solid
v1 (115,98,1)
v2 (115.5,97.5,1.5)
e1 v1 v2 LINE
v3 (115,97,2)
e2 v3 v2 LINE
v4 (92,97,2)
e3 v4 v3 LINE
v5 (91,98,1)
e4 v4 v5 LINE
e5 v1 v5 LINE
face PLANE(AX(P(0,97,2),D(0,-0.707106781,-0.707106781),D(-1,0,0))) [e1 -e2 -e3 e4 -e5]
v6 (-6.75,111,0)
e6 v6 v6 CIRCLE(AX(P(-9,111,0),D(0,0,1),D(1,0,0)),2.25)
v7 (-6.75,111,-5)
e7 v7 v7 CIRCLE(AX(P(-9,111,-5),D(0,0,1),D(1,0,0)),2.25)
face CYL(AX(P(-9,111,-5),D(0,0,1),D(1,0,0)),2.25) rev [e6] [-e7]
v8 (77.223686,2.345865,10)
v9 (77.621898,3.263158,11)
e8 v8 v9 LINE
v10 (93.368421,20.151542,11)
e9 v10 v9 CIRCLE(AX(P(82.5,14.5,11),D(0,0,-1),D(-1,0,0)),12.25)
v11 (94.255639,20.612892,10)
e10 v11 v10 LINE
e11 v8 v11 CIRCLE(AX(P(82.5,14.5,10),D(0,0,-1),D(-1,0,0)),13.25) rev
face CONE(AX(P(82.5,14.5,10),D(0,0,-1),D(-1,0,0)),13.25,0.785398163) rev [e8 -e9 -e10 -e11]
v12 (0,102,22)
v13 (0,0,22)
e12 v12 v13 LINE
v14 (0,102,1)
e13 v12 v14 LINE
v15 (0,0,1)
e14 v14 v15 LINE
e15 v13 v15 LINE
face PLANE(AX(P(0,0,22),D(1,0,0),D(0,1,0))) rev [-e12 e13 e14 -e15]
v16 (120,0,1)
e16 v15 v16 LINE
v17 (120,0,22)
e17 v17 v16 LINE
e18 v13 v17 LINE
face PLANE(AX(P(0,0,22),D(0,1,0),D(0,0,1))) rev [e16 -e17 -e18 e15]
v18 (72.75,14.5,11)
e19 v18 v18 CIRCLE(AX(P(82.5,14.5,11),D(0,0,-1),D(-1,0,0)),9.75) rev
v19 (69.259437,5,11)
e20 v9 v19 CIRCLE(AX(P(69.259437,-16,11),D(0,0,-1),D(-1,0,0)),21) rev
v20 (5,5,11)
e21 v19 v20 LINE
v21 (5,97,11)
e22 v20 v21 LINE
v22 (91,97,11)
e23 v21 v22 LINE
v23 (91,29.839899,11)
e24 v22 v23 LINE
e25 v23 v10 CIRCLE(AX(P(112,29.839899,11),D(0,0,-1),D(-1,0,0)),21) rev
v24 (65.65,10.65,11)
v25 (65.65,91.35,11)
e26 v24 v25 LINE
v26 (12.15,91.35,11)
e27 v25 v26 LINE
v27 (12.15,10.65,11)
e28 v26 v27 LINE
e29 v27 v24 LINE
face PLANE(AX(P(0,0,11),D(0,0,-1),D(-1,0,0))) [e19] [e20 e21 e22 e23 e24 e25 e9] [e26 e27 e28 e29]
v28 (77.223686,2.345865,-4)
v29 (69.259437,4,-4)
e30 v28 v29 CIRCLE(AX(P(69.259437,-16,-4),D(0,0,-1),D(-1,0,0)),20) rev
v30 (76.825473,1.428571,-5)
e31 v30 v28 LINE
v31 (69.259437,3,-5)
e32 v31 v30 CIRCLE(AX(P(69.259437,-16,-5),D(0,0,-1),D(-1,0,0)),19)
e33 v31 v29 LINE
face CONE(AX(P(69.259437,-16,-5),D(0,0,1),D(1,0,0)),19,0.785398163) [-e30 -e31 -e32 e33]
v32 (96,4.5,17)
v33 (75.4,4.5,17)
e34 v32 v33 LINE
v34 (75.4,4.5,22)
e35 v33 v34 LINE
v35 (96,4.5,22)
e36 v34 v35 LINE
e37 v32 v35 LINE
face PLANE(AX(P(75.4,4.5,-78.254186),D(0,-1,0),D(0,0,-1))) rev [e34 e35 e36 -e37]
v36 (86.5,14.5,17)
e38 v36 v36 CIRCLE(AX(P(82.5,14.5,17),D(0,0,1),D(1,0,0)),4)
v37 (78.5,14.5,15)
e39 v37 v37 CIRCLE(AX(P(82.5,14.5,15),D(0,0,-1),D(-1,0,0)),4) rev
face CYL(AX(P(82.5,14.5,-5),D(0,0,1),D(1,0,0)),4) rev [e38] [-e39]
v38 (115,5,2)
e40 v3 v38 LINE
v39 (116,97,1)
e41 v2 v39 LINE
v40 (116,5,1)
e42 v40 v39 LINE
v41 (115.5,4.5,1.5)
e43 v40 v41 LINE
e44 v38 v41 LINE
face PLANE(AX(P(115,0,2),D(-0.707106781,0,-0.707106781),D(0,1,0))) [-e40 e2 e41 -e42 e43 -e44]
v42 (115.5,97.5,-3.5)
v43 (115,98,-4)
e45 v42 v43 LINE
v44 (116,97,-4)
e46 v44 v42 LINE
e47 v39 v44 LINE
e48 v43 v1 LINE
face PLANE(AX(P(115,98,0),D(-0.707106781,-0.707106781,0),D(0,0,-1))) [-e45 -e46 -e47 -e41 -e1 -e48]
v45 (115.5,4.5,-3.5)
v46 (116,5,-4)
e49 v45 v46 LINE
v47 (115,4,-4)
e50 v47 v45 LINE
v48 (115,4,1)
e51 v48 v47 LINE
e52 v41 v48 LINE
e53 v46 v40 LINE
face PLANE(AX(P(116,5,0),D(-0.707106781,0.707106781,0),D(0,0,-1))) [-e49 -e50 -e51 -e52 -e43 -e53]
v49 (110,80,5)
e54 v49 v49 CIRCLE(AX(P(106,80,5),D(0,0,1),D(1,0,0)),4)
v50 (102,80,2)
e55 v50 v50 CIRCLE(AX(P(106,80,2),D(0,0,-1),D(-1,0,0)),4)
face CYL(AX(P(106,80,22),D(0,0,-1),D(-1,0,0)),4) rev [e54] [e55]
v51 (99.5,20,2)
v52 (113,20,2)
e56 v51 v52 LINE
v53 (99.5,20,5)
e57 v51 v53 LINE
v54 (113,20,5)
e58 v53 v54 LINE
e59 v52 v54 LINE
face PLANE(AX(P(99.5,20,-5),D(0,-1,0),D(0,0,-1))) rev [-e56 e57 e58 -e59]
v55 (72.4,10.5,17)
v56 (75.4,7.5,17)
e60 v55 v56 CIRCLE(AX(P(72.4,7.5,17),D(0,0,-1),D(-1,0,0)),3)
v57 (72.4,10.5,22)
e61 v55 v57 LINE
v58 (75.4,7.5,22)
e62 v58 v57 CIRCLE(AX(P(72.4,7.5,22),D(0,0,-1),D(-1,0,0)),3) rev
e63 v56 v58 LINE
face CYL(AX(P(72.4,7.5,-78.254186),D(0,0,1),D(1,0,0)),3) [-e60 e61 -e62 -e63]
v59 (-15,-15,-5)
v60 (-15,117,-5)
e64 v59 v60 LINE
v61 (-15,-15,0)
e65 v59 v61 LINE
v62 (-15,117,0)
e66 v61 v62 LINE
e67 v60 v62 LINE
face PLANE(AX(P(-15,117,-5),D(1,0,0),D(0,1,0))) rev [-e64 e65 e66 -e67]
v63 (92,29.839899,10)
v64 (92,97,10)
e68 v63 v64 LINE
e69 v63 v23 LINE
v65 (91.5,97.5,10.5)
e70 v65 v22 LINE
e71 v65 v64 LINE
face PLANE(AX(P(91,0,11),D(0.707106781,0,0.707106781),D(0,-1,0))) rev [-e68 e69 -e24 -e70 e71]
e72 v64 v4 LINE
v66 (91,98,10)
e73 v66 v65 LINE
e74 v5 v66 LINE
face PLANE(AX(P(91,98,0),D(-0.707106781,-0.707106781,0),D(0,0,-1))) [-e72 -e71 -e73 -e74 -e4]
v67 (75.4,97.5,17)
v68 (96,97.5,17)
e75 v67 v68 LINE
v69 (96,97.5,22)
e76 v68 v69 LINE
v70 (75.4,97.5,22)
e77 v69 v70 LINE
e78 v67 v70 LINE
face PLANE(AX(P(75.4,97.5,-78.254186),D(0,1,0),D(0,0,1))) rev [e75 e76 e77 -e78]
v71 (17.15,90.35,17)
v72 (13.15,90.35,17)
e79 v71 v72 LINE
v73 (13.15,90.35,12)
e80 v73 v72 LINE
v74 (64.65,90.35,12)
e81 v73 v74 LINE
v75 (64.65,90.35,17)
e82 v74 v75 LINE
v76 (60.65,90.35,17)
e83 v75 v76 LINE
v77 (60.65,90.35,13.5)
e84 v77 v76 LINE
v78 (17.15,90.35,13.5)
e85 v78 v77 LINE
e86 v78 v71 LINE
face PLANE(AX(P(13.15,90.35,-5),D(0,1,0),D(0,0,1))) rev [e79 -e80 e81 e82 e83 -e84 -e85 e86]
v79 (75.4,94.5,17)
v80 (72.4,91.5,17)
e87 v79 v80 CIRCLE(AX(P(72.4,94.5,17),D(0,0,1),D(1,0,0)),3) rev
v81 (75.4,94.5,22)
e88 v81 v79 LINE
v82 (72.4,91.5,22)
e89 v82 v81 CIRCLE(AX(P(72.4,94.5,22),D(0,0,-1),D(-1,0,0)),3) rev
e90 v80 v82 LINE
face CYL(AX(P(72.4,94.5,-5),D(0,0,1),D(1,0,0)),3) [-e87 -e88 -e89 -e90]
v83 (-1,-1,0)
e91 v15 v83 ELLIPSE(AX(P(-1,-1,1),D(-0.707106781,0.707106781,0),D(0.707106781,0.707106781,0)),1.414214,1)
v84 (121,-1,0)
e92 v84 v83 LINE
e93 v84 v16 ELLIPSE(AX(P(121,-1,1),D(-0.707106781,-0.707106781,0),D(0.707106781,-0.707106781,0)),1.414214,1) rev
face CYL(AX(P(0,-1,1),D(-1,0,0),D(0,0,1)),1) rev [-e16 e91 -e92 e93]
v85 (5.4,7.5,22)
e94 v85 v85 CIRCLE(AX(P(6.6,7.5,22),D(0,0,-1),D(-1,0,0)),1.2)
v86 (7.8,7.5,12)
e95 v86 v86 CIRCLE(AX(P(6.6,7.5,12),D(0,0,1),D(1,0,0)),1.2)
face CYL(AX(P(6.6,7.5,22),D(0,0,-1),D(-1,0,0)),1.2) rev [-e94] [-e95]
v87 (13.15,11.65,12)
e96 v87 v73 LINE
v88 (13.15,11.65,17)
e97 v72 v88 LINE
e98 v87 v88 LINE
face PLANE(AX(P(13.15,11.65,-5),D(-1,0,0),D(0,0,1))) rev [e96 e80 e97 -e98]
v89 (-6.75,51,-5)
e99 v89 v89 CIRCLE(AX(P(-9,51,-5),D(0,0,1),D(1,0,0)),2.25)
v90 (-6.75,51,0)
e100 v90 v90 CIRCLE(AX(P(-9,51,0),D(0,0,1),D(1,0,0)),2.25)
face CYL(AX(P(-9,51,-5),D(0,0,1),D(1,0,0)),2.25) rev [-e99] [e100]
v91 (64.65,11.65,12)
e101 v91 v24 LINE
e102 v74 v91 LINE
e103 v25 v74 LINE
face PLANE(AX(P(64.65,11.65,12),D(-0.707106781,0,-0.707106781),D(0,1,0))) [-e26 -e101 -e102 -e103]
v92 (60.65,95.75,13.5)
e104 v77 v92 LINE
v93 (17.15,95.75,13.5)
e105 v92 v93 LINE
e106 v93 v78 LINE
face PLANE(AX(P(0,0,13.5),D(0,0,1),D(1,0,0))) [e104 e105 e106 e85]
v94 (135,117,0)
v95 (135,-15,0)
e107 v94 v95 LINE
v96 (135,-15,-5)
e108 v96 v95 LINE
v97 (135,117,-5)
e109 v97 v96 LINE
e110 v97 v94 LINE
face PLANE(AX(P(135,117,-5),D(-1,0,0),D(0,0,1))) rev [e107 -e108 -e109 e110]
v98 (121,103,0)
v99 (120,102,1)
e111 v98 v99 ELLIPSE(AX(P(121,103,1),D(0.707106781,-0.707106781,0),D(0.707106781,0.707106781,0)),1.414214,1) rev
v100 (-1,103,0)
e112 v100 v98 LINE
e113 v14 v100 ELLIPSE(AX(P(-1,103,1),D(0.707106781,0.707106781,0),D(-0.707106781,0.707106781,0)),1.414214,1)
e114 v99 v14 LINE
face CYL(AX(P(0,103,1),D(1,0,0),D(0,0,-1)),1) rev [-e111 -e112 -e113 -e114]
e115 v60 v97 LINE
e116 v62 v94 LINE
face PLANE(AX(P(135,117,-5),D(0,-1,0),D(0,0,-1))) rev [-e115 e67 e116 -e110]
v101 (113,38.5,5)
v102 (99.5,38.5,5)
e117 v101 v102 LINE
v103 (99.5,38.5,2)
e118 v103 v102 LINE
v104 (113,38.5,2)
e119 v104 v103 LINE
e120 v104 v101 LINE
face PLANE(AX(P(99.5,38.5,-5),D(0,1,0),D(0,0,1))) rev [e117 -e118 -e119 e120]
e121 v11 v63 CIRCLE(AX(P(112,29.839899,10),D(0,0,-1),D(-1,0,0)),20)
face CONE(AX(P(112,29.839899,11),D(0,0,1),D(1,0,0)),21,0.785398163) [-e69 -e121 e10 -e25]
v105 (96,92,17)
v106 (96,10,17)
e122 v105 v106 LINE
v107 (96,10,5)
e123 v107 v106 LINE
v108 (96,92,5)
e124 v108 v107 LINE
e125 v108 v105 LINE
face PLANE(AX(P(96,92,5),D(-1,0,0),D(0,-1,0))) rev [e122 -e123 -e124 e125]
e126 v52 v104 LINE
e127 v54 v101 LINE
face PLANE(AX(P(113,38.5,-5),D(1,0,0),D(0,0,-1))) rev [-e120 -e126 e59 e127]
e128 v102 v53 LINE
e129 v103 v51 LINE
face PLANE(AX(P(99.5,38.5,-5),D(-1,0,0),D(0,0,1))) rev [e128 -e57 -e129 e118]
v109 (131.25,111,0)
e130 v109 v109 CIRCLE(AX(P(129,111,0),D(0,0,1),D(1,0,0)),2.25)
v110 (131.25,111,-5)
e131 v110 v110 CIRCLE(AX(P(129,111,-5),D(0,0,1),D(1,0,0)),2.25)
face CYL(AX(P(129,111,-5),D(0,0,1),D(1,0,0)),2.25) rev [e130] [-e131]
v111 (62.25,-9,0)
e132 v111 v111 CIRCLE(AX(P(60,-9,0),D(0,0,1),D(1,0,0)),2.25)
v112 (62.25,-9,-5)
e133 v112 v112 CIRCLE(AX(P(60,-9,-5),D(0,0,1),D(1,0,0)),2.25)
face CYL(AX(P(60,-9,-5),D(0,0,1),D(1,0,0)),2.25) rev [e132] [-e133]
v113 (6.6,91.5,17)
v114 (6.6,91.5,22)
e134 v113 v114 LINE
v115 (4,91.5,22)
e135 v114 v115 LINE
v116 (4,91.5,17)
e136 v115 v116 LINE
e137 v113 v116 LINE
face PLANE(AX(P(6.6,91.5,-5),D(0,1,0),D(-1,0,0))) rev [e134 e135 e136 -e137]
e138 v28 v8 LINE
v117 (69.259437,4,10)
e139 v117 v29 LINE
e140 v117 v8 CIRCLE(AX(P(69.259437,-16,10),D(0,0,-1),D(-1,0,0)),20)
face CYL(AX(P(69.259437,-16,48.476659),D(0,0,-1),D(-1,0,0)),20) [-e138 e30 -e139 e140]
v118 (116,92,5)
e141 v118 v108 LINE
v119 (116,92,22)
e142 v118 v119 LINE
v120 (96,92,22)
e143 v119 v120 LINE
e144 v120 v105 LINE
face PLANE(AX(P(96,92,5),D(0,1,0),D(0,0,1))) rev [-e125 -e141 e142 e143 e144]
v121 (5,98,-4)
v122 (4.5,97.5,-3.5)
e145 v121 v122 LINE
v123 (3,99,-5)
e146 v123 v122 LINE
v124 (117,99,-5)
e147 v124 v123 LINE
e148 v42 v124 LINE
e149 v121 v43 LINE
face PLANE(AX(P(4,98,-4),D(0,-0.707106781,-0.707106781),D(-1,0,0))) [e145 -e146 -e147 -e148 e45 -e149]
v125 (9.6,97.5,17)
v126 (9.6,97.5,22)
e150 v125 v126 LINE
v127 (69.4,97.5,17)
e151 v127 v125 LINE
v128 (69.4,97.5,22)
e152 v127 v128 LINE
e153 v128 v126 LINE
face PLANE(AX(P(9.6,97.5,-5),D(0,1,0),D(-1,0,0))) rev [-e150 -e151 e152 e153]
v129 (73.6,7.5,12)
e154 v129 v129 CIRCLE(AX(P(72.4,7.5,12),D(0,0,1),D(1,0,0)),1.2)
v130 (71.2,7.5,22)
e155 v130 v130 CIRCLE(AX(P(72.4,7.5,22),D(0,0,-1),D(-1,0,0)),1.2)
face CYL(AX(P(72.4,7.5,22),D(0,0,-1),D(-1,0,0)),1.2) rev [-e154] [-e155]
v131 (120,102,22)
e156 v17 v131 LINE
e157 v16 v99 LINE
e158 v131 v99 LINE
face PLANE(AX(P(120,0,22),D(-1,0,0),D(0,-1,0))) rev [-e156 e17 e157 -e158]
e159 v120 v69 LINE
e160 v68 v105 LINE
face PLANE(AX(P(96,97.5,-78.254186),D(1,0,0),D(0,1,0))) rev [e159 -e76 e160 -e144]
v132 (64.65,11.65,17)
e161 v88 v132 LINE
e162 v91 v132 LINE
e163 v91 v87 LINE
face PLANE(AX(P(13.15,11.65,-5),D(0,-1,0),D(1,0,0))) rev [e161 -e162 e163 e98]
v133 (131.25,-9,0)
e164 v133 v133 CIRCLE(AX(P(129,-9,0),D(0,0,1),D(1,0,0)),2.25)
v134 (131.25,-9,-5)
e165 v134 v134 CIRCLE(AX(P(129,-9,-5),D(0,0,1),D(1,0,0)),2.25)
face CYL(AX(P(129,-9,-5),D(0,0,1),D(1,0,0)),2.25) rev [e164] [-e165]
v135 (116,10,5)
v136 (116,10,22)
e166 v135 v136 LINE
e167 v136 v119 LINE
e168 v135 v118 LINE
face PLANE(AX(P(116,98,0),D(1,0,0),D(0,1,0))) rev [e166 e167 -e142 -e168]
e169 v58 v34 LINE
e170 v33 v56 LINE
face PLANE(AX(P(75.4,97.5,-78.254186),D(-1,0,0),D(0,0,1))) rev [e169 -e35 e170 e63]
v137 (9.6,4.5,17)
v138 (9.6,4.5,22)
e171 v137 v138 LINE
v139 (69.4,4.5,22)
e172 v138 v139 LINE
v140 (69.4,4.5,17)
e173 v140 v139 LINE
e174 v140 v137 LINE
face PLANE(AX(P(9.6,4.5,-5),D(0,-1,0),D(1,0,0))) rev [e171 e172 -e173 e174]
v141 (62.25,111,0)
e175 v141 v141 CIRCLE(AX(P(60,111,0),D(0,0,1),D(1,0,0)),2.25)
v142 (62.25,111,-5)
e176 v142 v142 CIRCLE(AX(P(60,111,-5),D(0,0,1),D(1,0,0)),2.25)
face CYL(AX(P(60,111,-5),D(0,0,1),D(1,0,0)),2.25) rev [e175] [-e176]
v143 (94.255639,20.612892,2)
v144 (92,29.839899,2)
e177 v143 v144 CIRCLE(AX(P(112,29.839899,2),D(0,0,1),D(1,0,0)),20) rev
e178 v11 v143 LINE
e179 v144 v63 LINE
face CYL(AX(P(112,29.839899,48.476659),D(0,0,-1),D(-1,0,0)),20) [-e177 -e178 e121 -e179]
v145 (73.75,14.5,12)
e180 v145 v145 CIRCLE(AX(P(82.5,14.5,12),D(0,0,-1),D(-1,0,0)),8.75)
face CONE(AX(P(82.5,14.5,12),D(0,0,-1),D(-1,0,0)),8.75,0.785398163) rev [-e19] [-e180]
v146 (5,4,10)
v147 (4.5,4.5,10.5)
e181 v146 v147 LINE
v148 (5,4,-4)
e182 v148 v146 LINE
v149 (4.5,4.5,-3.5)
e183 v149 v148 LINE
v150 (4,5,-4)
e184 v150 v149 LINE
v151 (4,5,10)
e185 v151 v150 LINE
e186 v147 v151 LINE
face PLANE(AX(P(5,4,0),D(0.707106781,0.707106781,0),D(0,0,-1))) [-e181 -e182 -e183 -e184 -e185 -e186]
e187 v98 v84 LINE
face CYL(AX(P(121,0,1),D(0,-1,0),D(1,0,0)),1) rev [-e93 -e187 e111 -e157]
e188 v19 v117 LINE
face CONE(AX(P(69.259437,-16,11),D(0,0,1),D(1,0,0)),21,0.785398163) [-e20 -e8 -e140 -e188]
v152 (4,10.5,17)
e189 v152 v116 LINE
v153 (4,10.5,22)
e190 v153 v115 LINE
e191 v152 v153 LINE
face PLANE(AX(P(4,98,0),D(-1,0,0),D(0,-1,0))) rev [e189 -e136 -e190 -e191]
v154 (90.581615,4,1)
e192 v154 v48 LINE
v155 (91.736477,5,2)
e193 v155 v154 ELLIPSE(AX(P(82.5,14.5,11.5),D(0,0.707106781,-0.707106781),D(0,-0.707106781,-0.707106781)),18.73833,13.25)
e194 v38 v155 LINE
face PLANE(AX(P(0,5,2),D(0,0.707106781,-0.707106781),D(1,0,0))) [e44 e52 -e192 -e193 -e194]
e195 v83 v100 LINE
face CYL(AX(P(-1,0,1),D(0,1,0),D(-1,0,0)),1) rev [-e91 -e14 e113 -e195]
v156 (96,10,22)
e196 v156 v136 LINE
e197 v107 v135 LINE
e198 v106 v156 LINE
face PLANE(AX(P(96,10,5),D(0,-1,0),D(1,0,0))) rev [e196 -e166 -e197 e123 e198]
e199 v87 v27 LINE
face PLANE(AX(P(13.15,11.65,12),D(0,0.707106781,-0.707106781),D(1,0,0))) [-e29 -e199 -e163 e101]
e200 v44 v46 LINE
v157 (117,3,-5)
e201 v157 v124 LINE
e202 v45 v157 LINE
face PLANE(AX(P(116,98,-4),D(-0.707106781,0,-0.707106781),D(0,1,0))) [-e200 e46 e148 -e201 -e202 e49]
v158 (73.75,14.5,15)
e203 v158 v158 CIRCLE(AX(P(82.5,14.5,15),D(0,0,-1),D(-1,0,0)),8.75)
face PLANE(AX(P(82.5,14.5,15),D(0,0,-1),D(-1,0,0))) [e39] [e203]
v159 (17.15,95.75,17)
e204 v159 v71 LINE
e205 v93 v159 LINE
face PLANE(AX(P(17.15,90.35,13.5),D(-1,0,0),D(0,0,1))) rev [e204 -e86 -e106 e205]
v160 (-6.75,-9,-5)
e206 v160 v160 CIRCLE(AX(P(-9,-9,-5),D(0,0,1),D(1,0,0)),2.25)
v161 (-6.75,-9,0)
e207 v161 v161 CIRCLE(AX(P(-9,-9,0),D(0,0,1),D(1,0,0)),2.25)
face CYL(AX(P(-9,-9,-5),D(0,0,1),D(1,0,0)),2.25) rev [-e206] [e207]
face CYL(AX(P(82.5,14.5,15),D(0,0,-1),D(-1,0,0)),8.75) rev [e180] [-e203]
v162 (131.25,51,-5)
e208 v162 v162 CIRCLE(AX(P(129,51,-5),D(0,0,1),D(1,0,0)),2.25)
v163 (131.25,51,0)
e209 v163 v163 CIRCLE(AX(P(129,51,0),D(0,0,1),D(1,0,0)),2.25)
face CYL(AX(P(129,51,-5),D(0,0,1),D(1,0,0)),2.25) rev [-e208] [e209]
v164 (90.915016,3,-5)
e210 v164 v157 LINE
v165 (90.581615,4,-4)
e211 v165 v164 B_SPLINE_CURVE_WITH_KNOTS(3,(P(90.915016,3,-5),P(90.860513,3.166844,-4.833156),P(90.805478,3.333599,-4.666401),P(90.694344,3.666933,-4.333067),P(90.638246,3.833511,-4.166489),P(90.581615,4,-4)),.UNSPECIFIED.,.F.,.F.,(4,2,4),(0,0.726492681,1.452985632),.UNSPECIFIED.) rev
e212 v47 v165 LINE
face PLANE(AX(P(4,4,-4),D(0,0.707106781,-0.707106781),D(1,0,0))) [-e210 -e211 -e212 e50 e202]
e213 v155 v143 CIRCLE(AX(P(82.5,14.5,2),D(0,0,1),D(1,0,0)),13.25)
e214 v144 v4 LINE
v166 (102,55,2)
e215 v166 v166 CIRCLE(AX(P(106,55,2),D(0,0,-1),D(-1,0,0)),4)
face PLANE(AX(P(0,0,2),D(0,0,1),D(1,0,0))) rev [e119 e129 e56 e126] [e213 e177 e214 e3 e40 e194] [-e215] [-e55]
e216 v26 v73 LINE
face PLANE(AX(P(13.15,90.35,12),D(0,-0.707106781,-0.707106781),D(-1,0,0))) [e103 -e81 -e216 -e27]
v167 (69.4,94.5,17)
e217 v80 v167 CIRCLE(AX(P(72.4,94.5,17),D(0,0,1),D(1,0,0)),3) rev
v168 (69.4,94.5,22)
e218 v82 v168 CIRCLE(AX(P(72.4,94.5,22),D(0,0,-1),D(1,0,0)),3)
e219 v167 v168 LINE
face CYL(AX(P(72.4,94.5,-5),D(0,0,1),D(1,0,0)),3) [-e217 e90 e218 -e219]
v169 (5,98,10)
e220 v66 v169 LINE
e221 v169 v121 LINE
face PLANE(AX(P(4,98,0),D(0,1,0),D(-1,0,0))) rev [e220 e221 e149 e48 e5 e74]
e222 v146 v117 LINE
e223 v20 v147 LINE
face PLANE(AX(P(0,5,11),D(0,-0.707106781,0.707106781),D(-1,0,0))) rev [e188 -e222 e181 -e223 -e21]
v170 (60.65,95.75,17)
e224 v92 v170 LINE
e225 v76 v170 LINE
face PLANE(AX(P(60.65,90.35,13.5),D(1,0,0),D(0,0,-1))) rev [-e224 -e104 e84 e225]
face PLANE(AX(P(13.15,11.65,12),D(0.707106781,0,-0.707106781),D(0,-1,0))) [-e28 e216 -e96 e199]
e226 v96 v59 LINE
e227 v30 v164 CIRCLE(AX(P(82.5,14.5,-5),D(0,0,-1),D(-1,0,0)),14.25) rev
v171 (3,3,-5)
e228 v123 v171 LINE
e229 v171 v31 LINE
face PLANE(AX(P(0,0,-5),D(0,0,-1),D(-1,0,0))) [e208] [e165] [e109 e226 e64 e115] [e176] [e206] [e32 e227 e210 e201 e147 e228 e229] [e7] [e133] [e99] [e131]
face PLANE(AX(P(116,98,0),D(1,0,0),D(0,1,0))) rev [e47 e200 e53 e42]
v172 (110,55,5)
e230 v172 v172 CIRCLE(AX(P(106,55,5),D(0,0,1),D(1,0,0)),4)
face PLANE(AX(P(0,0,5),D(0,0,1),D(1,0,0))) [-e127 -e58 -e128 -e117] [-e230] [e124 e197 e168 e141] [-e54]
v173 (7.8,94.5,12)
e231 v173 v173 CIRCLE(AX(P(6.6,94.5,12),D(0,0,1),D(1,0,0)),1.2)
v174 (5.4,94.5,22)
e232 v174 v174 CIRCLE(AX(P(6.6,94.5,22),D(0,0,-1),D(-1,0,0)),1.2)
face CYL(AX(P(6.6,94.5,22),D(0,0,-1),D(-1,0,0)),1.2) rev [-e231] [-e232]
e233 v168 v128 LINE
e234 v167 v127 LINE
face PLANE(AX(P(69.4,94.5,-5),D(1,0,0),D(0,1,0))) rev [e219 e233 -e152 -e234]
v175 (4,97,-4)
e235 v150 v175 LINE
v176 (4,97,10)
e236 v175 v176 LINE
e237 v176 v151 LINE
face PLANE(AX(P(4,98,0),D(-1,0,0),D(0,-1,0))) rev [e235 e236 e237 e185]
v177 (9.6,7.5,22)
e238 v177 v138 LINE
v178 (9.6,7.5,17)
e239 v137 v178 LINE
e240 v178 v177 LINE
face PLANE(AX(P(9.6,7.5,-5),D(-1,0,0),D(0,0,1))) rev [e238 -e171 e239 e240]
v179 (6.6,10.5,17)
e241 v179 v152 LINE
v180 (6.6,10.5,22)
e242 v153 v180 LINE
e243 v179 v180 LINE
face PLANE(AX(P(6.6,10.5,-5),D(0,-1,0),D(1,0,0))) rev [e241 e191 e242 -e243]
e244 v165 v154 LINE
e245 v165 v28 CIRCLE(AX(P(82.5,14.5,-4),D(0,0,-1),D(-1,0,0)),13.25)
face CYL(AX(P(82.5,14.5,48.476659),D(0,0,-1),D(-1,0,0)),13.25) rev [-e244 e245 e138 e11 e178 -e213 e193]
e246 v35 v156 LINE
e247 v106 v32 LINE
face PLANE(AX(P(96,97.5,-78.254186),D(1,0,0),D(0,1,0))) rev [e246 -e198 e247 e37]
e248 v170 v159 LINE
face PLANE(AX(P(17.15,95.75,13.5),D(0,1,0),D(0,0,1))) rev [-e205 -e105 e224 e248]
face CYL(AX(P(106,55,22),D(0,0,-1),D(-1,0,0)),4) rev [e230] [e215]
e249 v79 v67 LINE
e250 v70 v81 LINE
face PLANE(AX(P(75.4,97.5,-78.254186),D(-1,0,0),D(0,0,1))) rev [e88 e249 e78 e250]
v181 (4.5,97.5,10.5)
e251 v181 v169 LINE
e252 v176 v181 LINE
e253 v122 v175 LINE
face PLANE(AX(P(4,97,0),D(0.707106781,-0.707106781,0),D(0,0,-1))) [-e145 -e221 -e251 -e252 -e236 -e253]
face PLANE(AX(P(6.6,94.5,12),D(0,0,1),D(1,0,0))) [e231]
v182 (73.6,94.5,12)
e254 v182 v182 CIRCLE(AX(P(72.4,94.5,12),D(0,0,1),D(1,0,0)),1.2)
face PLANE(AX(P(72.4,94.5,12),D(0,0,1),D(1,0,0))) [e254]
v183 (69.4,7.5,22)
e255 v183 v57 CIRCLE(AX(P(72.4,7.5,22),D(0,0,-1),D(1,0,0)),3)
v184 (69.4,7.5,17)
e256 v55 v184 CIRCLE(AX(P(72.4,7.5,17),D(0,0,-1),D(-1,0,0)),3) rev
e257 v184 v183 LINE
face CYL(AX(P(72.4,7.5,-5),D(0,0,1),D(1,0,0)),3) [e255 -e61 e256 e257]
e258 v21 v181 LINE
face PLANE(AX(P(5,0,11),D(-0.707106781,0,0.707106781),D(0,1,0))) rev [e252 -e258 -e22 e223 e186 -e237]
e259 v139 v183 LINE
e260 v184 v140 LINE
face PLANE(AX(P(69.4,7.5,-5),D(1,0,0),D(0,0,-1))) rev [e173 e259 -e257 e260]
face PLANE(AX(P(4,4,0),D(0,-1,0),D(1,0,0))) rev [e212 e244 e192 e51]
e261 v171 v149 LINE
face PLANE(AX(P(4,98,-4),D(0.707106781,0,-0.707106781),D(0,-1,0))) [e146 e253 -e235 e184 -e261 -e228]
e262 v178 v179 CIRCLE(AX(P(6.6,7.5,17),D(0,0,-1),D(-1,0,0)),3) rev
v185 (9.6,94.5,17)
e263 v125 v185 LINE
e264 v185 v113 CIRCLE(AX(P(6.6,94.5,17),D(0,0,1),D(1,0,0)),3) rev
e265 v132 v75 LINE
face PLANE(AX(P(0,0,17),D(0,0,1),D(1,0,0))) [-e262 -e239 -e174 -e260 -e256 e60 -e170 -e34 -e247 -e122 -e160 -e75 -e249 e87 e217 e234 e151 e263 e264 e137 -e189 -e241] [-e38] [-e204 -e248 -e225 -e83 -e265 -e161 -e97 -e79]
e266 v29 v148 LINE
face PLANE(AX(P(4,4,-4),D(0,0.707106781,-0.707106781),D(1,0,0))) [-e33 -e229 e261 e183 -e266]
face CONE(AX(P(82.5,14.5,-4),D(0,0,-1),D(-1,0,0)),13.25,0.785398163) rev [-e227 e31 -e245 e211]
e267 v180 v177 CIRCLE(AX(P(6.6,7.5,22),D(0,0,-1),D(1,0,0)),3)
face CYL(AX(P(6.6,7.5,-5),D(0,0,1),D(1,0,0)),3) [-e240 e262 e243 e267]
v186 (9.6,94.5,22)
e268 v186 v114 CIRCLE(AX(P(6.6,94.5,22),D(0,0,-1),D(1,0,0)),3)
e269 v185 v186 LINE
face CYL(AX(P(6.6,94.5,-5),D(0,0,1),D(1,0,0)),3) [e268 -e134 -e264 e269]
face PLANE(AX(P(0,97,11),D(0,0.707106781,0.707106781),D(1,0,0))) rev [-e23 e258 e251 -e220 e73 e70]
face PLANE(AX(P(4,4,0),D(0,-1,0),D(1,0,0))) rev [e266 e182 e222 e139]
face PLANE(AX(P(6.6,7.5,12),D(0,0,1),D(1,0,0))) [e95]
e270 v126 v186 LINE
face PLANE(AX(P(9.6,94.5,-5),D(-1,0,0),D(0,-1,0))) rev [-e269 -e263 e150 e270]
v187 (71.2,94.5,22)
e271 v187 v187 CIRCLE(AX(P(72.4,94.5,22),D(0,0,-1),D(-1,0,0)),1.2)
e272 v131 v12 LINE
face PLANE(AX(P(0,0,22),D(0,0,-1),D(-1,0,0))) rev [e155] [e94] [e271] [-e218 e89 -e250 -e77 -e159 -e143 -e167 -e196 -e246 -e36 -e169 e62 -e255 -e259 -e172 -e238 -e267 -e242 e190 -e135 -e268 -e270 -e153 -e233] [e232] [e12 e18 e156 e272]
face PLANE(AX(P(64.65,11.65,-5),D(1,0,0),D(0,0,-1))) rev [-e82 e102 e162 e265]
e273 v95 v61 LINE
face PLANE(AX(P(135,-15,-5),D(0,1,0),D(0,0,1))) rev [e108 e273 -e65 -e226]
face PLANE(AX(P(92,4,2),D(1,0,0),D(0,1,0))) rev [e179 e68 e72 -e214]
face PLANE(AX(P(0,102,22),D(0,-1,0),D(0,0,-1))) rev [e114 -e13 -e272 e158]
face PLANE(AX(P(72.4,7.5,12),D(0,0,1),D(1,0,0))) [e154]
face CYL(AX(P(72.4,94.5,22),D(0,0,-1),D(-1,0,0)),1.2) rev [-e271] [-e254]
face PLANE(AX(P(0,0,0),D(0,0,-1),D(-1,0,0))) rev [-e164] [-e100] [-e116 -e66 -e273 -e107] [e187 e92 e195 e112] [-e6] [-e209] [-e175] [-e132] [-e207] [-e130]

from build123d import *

# Parameters (mm, degrees)
SKETCH_1_W          = 120
SKETCH_1_H          = 102
EXTRUDE_1_DEPTH     = 22
SKETCH_2_W          = 112
SKETCH_2_H          = 94
CUT_EXTRUDE_1_DEPTH = 160.022011055
SKETCH_3_W          = 150
SKETCH_3_H          = 132
SKETCH_3_W_2        = 112
SKETCH_3_H_2        = 94
EXTRUDE_2_DEPTH     = 5
SKETCH_4_W          = 112
SKETCH_4_H          = 15
EXTRUDE_3_DEPTH     = 5
SKETCH_6_R          = 1.2
CUT_EXTRUDE_2_DEPTH = 180.994444359
FILLET_1_R          = 1
SKETCH_7_R          = 2.25
CUT_EXTRUDE_3_DEPTH = 180.994444359
SKETCH_8_W          = 24
SKETCH_8_H          = 94
EXTRUDE_4_DEPTH     = 15
SKETCH_9_W          = 20
SKETCH_9_H          = 82
CUT_EXTRUDE_4_DEPTH = 17
SKETCH_10_R         = 4
CUT_EXTRUDE_5_DEPTH = 180.760952378
SKETCH_11_W         = 13.5
SKETCH_11_H         = 18.5
CUT_EXTRUDE_6_DEPTH = 180.451943428
CUT_EXTRUDE1_DEPTH  = 181.673739099
SKETCH2_W           = 20.6
SKETCH2_H           = 93
CUT_EXTRUDE2_DEPTH  = 5
FILLET1_R           = 3
SKETCH3_W           = 27
SKETCH3_H           = 81
BOSS_EXTRUDE1_DEPTH = 0.4
SKETCH4_W           = 88
SKETCH4_H           = 94
BOSS_EXTRUDE2_DEPTH = 6
SKETCH6_W           = 51.5
SKETCH6_H           = 78.7
CUT_EXTRUDE3_DEPTH  = 180.994444359
SKETCH7_W           = 43.5
SKETCH7_H           = 5.4
CUT_EXTRUDE4_DEPTH  = 3.5
SKETCH8_R           = 4
CUT_EXTRUDE5_DEPTH  = 180.994444359
SKETCH9_R           = 8.75
CUT_EXTRUDE6_DEPTH  = 4
CUT_EXTRUDE8_START  = -5
SKETCH11_R          = 1.2
CUT_EXTRUDE8_DEPTH  = 5
SKETCH13_R          = 13.25
CUT_EXTRUDE9_DEPTH  = 16
BOSS_EXTRUDE3_DEPTH = 9
FILLET2_R           = 20
CHAMFER1_SIZE       = 1
CHAMFER2_SIZE       = 1
CHAMFER4_SIZE       = 1


# Some blends are built 0.0001 mm under size
with BuildPart() as part:
    # Эскиз1 → Бобышка-Вытянуть1 (new body)
    with BuildSketch(Plane.XY):
        with Locations((60, 51)):
            Rectangle(SKETCH_1_W, SKETCH_1_H)
    extrude(amount=EXTRUDE_1_DEPTH)

    # Эскиз2 → Вырез-Вытянуть1 (cut, through all)
    with BuildSketch(Plane.XY.offset(22)):
        with Locations((60, 51)):
            Rectangle(SKETCH_2_W, SKETCH_2_H)
    extrude(amount=-CUT_EXTRUDE_1_DEPTH, mode=Mode.SUBTRACT)

    # Эскиз3 → Бобышка-Вытянуть2 (add)
    with BuildSketch(Plane(origin=(0, 0, 0), x_dir=(-1, 0, 0), z_dir=(0, 0, -1))):
        with Locations((-60, 51)):
            Rectangle(SKETCH_3_W, SKETCH_3_H)
        with Locations((-60, 51)):
            Rectangle(SKETCH_3_W_2, SKETCH_3_H_2, mode=Mode.SUBTRACT)
    extrude(amount=EXTRUDE_2_DEPTH)

    # Эскиз4 → Бобышка-Вытянуть3 (add)
    with BuildSketch(Plane.XY.offset(22)):
        with Locations((60, 90.5)):
            Rectangle(SKETCH_4_W, SKETCH_4_H)
        with Locations((60, 11.5)):
            Rectangle(SKETCH_4_W, SKETCH_4_H)
    extrude(amount=-EXTRUDE_3_DEPTH)

    # Эскиз6 → Вырез-Вытянуть2 (cut, through all)
    with BuildSketch(Plane(origin=(0, 0, 17), x_dir=(-1, 0, 0), z_dir=(0, 0, -1))):
        with Locations((-6.6, 94.5)):
            Circle(SKETCH_6_R)
        with Locations((-72.4, 94.5)):
            Circle(SKETCH_6_R)
        with Locations((-6.6, 7.5)):
            Circle(SKETCH_6_R)
        with Locations((-72.4, 7.5)):
            Circle(SKETCH_6_R)
    extrude(amount=-CUT_EXTRUDE_2_DEPTH, mode=Mode.SUBTRACT)

    # Скругление1
    fillet_1_edges = [part.edges().sort_by_distance(p)[0] for p in [
        (60, 102, 0),
        (120, 51, 0),
        (60, 0, 0),
        (0, 51, 0),
    ]]
    fillet(fillet_1_edges, radius=FILLET_1_R)

    # Эскиз7 → Вырез-Вытянуть3 (cut, through all)
    with BuildSketch(Plane.XY):
        with Locations((-9, 111)):
            Circle(SKETCH_7_R)
        with Locations((129, 111)):
            Circle(SKETCH_7_R)
        with Locations((129, -9)):
            Circle(SKETCH_7_R)
        with Locations((-9, -9)):
            Circle(SKETCH_7_R)
        with Locations((-9, 51)):
            Circle(SKETCH_7_R)
        with Locations((60, 111)):
            Circle(SKETCH_7_R)
        with Locations((129, 51)):
            Circle(SKETCH_7_R)
        with Locations((60, -9)):
            Circle(SKETCH_7_R)
    extrude(amount=-CUT_EXTRUDE_3_DEPTH, mode=Mode.SUBTRACT)

    # Эскиз8 → Бобышка-Вытянуть4 (add)
    with BuildSketch(Plane(origin=(0, 0, 17), x_dir=(-1, 0, 0), z_dir=(0, 0, -1))):
        with Locations((-104, 51)):
            Rectangle(SKETCH_8_W, SKETCH_8_H)
    extrude(amount=EXTRUDE_4_DEPTH)

    # Эскиз9 → Вырез-Вытянуть4 (cut)
    with BuildSketch(Plane.XY.offset(22)):
        with Locations((106, 51)):
            Rectangle(SKETCH_9_W, SKETCH_9_H)
    extrude(amount=-CUT_EXTRUDE_4_DEPTH, mode=Mode.SUBTRACT)

    # Эскиз10 → Вырез-Вытянуть5 (cut, through all)
    with BuildSketch(Plane(origin=(0, 0, 2), x_dir=(-1, 0, 0), z_dir=(0, 0, -1))):
        with Locations((-106, 80)):
            Circle(SKETCH_10_R)
        with Locations((-106, 55)):
            Circle(SKETCH_10_R)
    extrude(amount=-CUT_EXTRUDE_5_DEPTH, mode=Mode.SUBTRACT)

    # Эскиз11 → Вырез-Вытянуть6 (cut, through all)
    with BuildSketch(Plane.XY.offset(5)):
        with Locations((106.25, 29.25)):
            Rectangle(SKETCH_11_W, SKETCH_11_H)
    extrude(amount=-CUT_EXTRUDE_6_DEPTH, mode=Mode.SUBTRACT)

    # Sketch1 → Cut-Extrude1 (cut, through all)
    with BuildSketch(Plane.XY.offset(22)):
        with BuildLine():
            Line((3.6, 10.5), (3.6, 91.5))
            Line((3.6, 91.5), (6.6, 91.5))
            ThreePointArc((6.6, 91.5), (8.721320344, 92.378679656), (9.6, 94.5))
            Line((9.6, 94.5), (9.6, 97.5))
            Line((9.6, 97.5), (69.4, 97.5))
            Line((69.4, 97.5), (69.4, 94.5))
            ThreePointArc((69.4, 94.5), (70.278679656, 92.378679656), (72.4, 91.5))
            Line((72.4, 91.5), (75.4, 91.5))
            Line((75.4, 91.5), (75.4, 10.5))
            Line((75.4, 10.5), (72.4, 10.5))
            ThreePointArc((72.4, 10.5), (70.278679656, 9.621320344), (69.4, 7.5))
            Line((69.4, 7.5), (69.4, 4.5))
            Line((69.4, 4.5), (9.6, 4.5))
            Line((9.6, 4.5), (9.6, 7.5))
            ThreePointArc((9.6, 7.5), (8.721320344, 9.621320344), (6.6, 10.5))
            Line((6.6, 10.5), (3.6, 10.5))
        make_face()
    extrude(amount=-CUT_EXTRUDE1_DEPTH, mode=Mode.SUBTRACT)

    # Sketch2 → Cut-Extrude2 (cut)
    with BuildSketch(Plane.XY.offset(22)):
        with Locations((85.7, 51)):
            Rectangle(SKETCH2_W, SKETCH2_H)
    extrude(amount=-CUT_EXTRUDE2_DEPTH, mode=Mode.SUBTRACT)

    # Fillet1
    fillet1_edges = [part.edges().sort_by_distance(p)[0] for p in [
        (75.4, 91.5, 19.5),
        (75.4, 10.5, 19.5),
    ]]
    fillet(fillet1_edges, radius=FILLET1_R - 0.0001)  # a hair under: the kernel refuses the full size

    # Sketch3 → Boss-Extrude1 (add)
    with BuildSketch(Plane(origin=(3.6, 0, 0), x_dir=(0, 0, -1), z_dir=(1, 0, 0))):
        with Locations((-8.5, 51)):
            Rectangle(SKETCH3_W, SKETCH3_H)
    extrude(amount=BOSS_EXTRUDE1_DEPTH)

    # Sketch4 → Boss-Extrude2 (add)
    with BuildSketch(Plane(origin=(0, 0, 17), x_dir=(-1, 0, 0), z_dir=(0, 0, -1))):
        with Locations((-48, 51)):
            Rectangle(SKETCH4_W, SKETCH4_H)
    extrude(amount=BOSS_EXTRUDE2_DEPTH)

    # Sketch6 → Cut-Extrude3 (cut, through all)
    with BuildSketch(Plane.XY.offset(17)):
        with Locations((38.9, 51)):
            Rectangle(SKETCH6_W, SKETCH6_H)
    extrude(amount=-CUT_EXTRUDE3_DEPTH, mode=Mode.SUBTRACT)

    # Sketch7 → Cut-Extrude4 (cut)
    with BuildSketch(Plane.XY.offset(17)):
        with Locations((38.9, 93.05)):
            Rectangle(SKETCH7_W, SKETCH7_H)
    extrude(amount=-CUT_EXTRUDE4_DEPTH, mode=Mode.SUBTRACT)

    # Sketch8 → Cut-Extrude5 (cut, through all)
    with BuildSketch(Plane.XY.offset(17)):
        with Locations((82.5, 14.5)):
            Circle(SKETCH8_R)
    extrude(amount=-CUT_EXTRUDE5_DEPTH, mode=Mode.SUBTRACT)

    # Sketch9 → Cut-Extrude6 (cut)
    with BuildSketch(Plane(origin=(0, 0, 11), x_dir=(-1, 0, 0), z_dir=(0, 0, -1))):
        with Locations((-82.5, 14.5)):
            Circle(SKETCH9_R)
    extrude(amount=-CUT_EXTRUDE6_DEPTH, mode=Mode.SUBTRACT)

    # Sketch11 → Cut-Extrude8 (cut)
    with BuildSketch(Plane.XY.offset(17).offset(CUT_EXTRUDE8_START)):
        with Locations(Location((6.6, 7.5, 0), (0, 0, 180))):
            Circle(SKETCH11_R)
        with Locations(Location((6.6, 94.5, 0), (0, 0, 180))):
            Circle(SKETCH11_R)
        with Locations(Location((72.4, 7.5, 0), (0, 0, 180))):
            Circle(SKETCH11_R)
        with Locations(Location((72.4, 94.5, 0), (0, 0, 180))):
            Circle(SKETCH11_R)
    extrude(amount=CUT_EXTRUDE8_DEPTH, mode=Mode.SUBTRACT)

    # Sketch13 → Cut-Extrude9 (cut)
    with BuildSketch(Plane(origin=(0, 0, -5), x_dir=(-1, 0, 0), z_dir=(0, 0, -1))):
        with Locations((-82.5, 14.5)):
            Circle(SKETCH13_R)
    extrude(amount=-CUT_EXTRUDE9_DEPTH, mode=Mode.SUBTRACT)

    # Sketch14 → Boss-Extrude3 (add)
    with BuildSketch(Plane(origin=(0, 0, 2), x_dir=(-1, 0, 0), z_dir=(0, 0, -1))):
        with BuildLine():
            Line((-92, 4), (-92, 5.263523399))
            ThreePointArc((-92, 5.263523399), (-91.313479381, 4.606311042), (-90.581614938, 4))
            Line((-90.581614938, 4), (-92, 4))
        make_face()
    extrude(amount=-BOSS_EXTRUDE3_DEPTH)

    # Fillet2
    fillet2_edges = [part.edges().sort_by_distance(p)[0] for p in [
        (74.418385062, 4, 3),
        (92, 23.736476601, 6.5),
    ]]
    fillet(fillet2_edges, radius=FILLET2_R)

    # Chamfer1
    chamfer1_edges = [part.edges().sort_by_distance(p)[0] for p in [
        (48, 98, 11),
        (92, 63.919949478, 11),
        (4, 51, 11),
        (64.65, 51, 11),
        (38.9, 90.35, 11),
        (13.15, 51, 11),
        (38.9, 11.65, 11),
        (91.25, 14.5, 11),
        (95.609207756, 12.573559754, 11),
        (36.629718662, 4, 11),
        (92.572092006, 25.090542055, 11),
        (73.32654359, 3.582100158, 11),
    ]]
    chamfer(chamfer1_edges, length=CHAMFER1_SIZE)

    # Chamfer2
    # the kernel refuses this chamfer: 1 mm, written as the material it adds along each edge
    with BuildSketch(Plane(origin=(92, 98, 12.571682988), x_dir=(-0.999621916911297, 0.027495876610582292, 0), z_dir=(0, 0, -1))) as chamfer2_piece_1:
        Polygon((CHAMFER2_SIZE * 0.999621916911, -CHAMFER2_SIZE * 0.0274958766106), (-CHAMFER2_SIZE * 0.0274958766106, -CHAMFER2_SIZE * 0.999621916911), (0, 0), align=None)
    extrude(amount=10.571682988)
    with BuildSketch(Plane(origin=(116, 100.571682988, 2), x_dir=(-0.9996219169112968, 0, 0.027495876610586605), z_dir=(0, -1, 0))) as chamfer2_piece_2:
        Polygon((CHAMFER2_SIZE * 0.999621916911, CHAMFER2_SIZE * 0.0274958766106), (-CHAMFER2_SIZE * 0.0274958766106, CHAMFER2_SIZE * 0.999621916911), (0, 0), align=None)
    extrude(amount=99.143365976)
    with BuildSketch(Plane(origin=(118.571682988, 4, 2), x_dir=(0, 0.9996219169112968, 0.027495876610586487), z_dir=(-1, 0, 0))) as chamfer2_piece_3_section:
        Polygon((CHAMFER2_SIZE * 0.999621916911, CHAMFER2_SIZE * 0.0274958766106), (-CHAMFER2_SIZE * 0.0274958766106, CHAMFER2_SIZE * 0.999621916911), (0, 0), align=None)
    chamfer2_piece_3 = extrude(amount=30.561751038, mode=Mode.PRIVATE)
    chamfer2_piece_3 = chamfer2_piece_3 - Plane(origin=(82.5, 14.5, 1.670206373), x_dir=(-1, 0, 0), z_dir=(0, 0, -1)) * Cylinder(13.25, 66, mode=Mode.PRIVATE)
    add(chamfer2_piece_3)
    with BuildSketch(Plane(origin=(92, 98, 2), x_dir=(0, -0.9996219169112968, 0.027495876610586605), z_dir=(1, 0, 0))) as chamfer2_piece_4:
        Polygon((CHAMFER2_SIZE * 0.999621916911, CHAMFER2_SIZE * 0.0274958766106), (-CHAMFER2_SIZE * 0.0274958766106, CHAMFER2_SIZE * 0.999621916911), (0, 0), align=None)
    extrude(amount=26.571682988)
    with BuildSketch(Plane(origin=(89.428317012, 98, 2), x_dir=(0, -0.9996219169112968, 0.027495876610586605), z_dir=(1, 0, 0))) as chamfer2_piece_5a_section:
        Polygon((CHAMFER2_SIZE * 0.999621916911, CHAMFER2_SIZE * 0.0274958766106), (-CHAMFER2_SIZE * 0.0274958766106, CHAMFER2_SIZE * 0.999621916911), (0, 0), align=None)
    chamfer2_piece_5a = extrude(amount=26.571682988, mode=Mode.PRIVATE)
    chamfer2_piece_5a = split(chamfer2_piece_5a, bisect_by=Plane(origin=(92, 97.670206373, 1.670206373), z_dir=(-1, 0, 0)), keep=Keep.TOP, mode=Mode.PRIVATE)
    with BuildSketch(Plane(origin=(92, 98, 12.571682988), x_dir=(-0.999621916911297, 0.027495876610582292, 0), z_dir=(0, 0, -1))) as chamfer2_piece_5b_section:
        Polygon((CHAMFER2_SIZE * 0.999621916911, -CHAMFER2_SIZE * 0.0274958766106), (-CHAMFER2_SIZE * 0.0274958766106, -CHAMFER2_SIZE * 0.999621916911), (0, 0), align=None)
    chamfer2_piece_5b = extrude(amount=13.143365976, mode=Mode.PRIVATE)
    chamfer2_piece_5b = split(chamfer2_piece_5b, bisect_by=Plane(origin=(91.670206373, 97.670206373, 2), z_dir=(0, 0, -1)), keep=Keep.TOP, mode=Mode.PRIVATE)
    chamfer2_piece_5 = chamfer2_piece_5a & chamfer2_piece_5b
    add(chamfer2_piece_5)
    # the kernel refuses this chamfer: 1 mm, written as the material it takes off along each edge
    with BuildSketch(Plane(origin=(116, 4, -5), x_dir=(-0.02749587661058217, 0, 0.9996219169112968), z_dir=(0, 1, 0)), Plane(origin=(4, 4, -5), x_dir=(-0.9996219169112968, 0, -0.027495876610586556), z_dir=(0, 1, 0))) as chamfer2_2_piece_1:
        Polygon((CHAMFER2_SIZE * 0.999621916911, CHAMFER2_SIZE * 0.0274958766106), (-CHAMFER2_SIZE * 0.0274958766106, CHAMFER2_SIZE * 0.999621916911), (0, 0), align=None)
    extrude(amount=94, mode=Mode.SUBTRACT)
    with BuildSketch(Plane(origin=(88.00993195, 4, -5), x_dir=(0, 0.027495876610586487, 0.9996219169112968), z_dir=(1, 0, 0))) as chamfer2_2_piece_2:
        Polygon((CHAMFER2_SIZE * 0.999621916911, CHAMFER2_SIZE * 0.0274958766106), (-CHAMFER2_SIZE * 0.0274958766106, CHAMFER2_SIZE * 0.999621916911), (0, 0), align=None)
    extrude(amount=27.99006805, mode=Mode.SUBTRACT)
    with BuildSketch(Plane(origin=(116, 98, -5), x_dir=(0, -0.02749587661058217, 0.9996219169112968), z_dir=(-1, 0, 0))) as chamfer2_2_piece_3:
        Polygon((CHAMFER2_SIZE * 0.999621916911, CHAMFER2_SIZE * 0.0274958766106), (-CHAMFER2_SIZE * 0.0274958766106, CHAMFER2_SIZE * 0.999621916911), (0, 0), align=None)
    extrude(amount=112, mode=Mode.SUBTRACT)
    with BuildSketch(Plane(origin=(82.5, 14.5, -5), x_dir=(0.7513473566279231, -0.6599069250191519, 0), z_dir=(0.6599069250191519, 0.7513473566279231, 0))) as chamfer2_2_piece_4:
        Polygon((13.25, -CHAMFER2_SIZE), (13.25 + CHAMFER2_SIZE, 0), (13.25, 0), align=None)
    revolve(axis=Axis((82.5, 14.5, -5), (0, 0, -1)), revolution_arc=72.173700394, mode=Mode.SUBTRACT)
    with BuildSketch(Plane(origin=(4, 4, -5), x_dir=(0, 0.027495876610586053, 0.9996219169112968), z_dir=(1, 0, 0))) as chamfer2_2_piece_5:
        Polygon((CHAMFER2_SIZE * 0.999621916911, CHAMFER2_SIZE * 0.0274958766106), (-CHAMFER2_SIZE * 0.0274958766106, CHAMFER2_SIZE * 0.999621916911), (0, 0), align=None)
    extrude(amount=65.259437323, mode=Mode.SUBTRACT)
    with BuildSketch(Plane(origin=(69.259437323, -16, -5), x_dir=(0, 1, 0), z_dir=(-1, 0, 0))) as chamfer2_2_piece_6:
        Polygon((20, -CHAMFER2_SIZE), (20 - CHAMFER2_SIZE, 0), (20, 0), align=None)
    revolve(axis=Axis((69.259437323, -16, -5), (0, 0, -1)), revolution_arc=23.466475145, mode=Mode.SUBTRACT)
    with BuildSketch(Plane(origin=(116, 1.428317012, -5), x_dir=(-0.02749587661058217, 0, 0.9996219169112968), z_dir=(0, 1, 0))) as chamfer2_2_piece_7a_section:
        Polygon((CHAMFER2_SIZE * 0.999621916911, CHAMFER2_SIZE * 0.0274958766106), (-CHAMFER2_SIZE * 0.0274958766106, CHAMFER2_SIZE * 0.999621916911), (0, 0), align=None)
    chamfer2_2_piece_7a = extrude(amount=96.571682988, mode=Mode.PRIVATE)
    chamfer2_2_piece_7a = split(chamfer2_2_piece_7a, bisect_by=Plane(origin=(116.329793627, 4, -4.670206373), z_dir=(0, -1, 0)), keep=Keep.TOP, mode=Mode.PRIVATE)
    with BuildSketch(Plane(origin=(88.00993195, 4, -5), x_dir=(0, 0.027495876610586487, 0.9996219169112968), z_dir=(1, 0, 0))) as chamfer2_2_piece_7b_section:
        Polygon((CHAMFER2_SIZE * 0.999621916911, CHAMFER2_SIZE * 0.0274958766106), (-CHAMFER2_SIZE * 0.0274958766106, CHAMFER2_SIZE * 0.999621916911), (0, 0), align=None)
    chamfer2_2_piece_7b = extrude(amount=30.561751038, mode=Mode.PRIVATE)
    chamfer2_2_piece_7b = split(chamfer2_2_piece_7b, bisect_by=Plane(origin=(116, 3.670206373, -4.670206373), z_dir=(1, 0, 0)), keep=Keep.TOP, mode=Mode.PRIVATE)
    chamfer2_2_piece_7 = chamfer2_2_piece_7a & chamfer2_2_piece_7b
    add(chamfer2_2_piece_7, mode=Mode.SUBTRACT)
    with BuildSketch(Plane(origin=(118.571682988, 98, -5), x_dir=(0, -0.02749587661058217, 0.9996219169112968), z_dir=(-1, 0, 0))) as chamfer2_2_piece_8a_section:
        Polygon((CHAMFER2_SIZE * 0.999621916911, CHAMFER2_SIZE * 0.0274958766106), (-CHAMFER2_SIZE * 0.0274958766106, CHAMFER2_SIZE * 0.999621916911), (0, 0), align=None)
    chamfer2_2_piece_8a = extrude(amount=114.571682988, mode=Mode.PRIVATE)
    chamfer2_2_piece_8a = split(chamfer2_2_piece_8a, bisect_by=Plane(origin=(116, 98.329793627, -4.670206373), z_dir=(1, 0, 0)), keep=Keep.TOP, mode=Mode.PRIVATE)
    with BuildSketch(Plane(origin=(116, 4, -5), x_dir=(-0.02749587661058217, 0, 0.9996219169112968), z_dir=(0, 1, 0))) as chamfer2_2_piece_8b_section:
        Polygon((CHAMFER2_SIZE * 0.999621916911, CHAMFER2_SIZE * 0.0274958766106), (-CHAMFER2_SIZE * 0.0274958766106, CHAMFER2_SIZE * 0.999621916911), (0, 0), align=None)
    chamfer2_2_piece_8b = extrude(amount=96.571682988, mode=Mode.PRIVATE)
    chamfer2_2_piece_8b = split(chamfer2_2_piece_8b, bisect_by=Plane(origin=(116.329793627, 98, -4.670206373), z_dir=(0, 1, 0)), keep=Keep.TOP, mode=Mode.PRIVATE)
    chamfer2_2_piece_8 = chamfer2_2_piece_8a & chamfer2_2_piece_8b
    add(chamfer2_2_piece_8, mode=Mode.SUBTRACT)
    with BuildSketch(Plane(origin=(1.428317012, 4, -5), x_dir=(0, 0.027495876610586487, 0.9996219169112968), z_dir=(1, 0, 0))) as chamfer2_2_piece_9a_section:
        Polygon((CHAMFER2_SIZE * 0.999621916911, CHAMFER2_SIZE * 0.0274958766106), (-CHAMFER2_SIZE * 0.0274958766106, CHAMFER2_SIZE * 0.999621916911), (0, 0), align=None)
    chamfer2_2_piece_9a = extrude(amount=67.831120311, mode=Mode.PRIVATE)
    chamfer2_2_piece_9a = split(chamfer2_2_piece_9a, bisect_by=Plane(origin=(4, 3.670206373, -4.670206373), z_dir=(-1, 0, 0)), keep=Keep.TOP, mode=Mode.PRIVATE)
    with BuildSketch(Plane(origin=(4, 1.428317012, -5), x_dir=(-0.9996219169112968, 0, -0.027495876610586487), z_dir=(0, 1, 0))) as chamfer2_2_piece_9b_section:
        Polygon((CHAMFER2_SIZE * 0.999621916911, CHAMFER2_SIZE * 0.0274958766106), (-CHAMFER2_SIZE * 0.0274958766106, CHAMFER2_SIZE * 0.999621916911), (0, 0), align=None)
    chamfer2_2_piece_9b = extrude(amount=96.571682988, mode=Mode.PRIVATE)
    chamfer2_2_piece_9b = split(chamfer2_2_piece_9b, bisect_by=Plane(origin=(3.670206373, 4, -4.670206373), z_dir=(0, -1, 0)), keep=Keep.TOP, mode=Mode.PRIVATE)
    chamfer2_2_piece_9 = chamfer2_2_piece_9a & chamfer2_2_piece_9b
    add(chamfer2_2_piece_9, mode=Mode.SUBTRACT)
    with BuildSketch(Plane(origin=(116, 98, -5), x_dir=(0, -0.02749587661058217, 0.9996219169112968), z_dir=(-1, 0, 0))) as chamfer2_2_piece_10a_section:
        Polygon((CHAMFER2_SIZE * 0.999621916911, CHAMFER2_SIZE * 0.0274958766106), (-CHAMFER2_SIZE * 0.0274958766106, CHAMFER2_SIZE * 0.999621916911), (0, 0), align=None)
    chamfer2_2_piece_10a = extrude(amount=114.571682988, mode=Mode.PRIVATE)
    chamfer2_2_piece_10a = split(chamfer2_2_piece_10a, bisect_by=Plane(origin=(4, 98.329793627, -4.670206373), z_dir=(-1, 0, 0)), keep=Keep.TOP, mode=Mode.PRIVATE)
    with BuildSketch(Plane(origin=(4, 4, -5), x_dir=(-0.9996219169112968, 0, -0.027495876610586556), z_dir=(0, 1, 0))) as chamfer2_2_piece_10b_section:
        Polygon((CHAMFER2_SIZE * 0.999621916911, CHAMFER2_SIZE * 0.0274958766106), (-CHAMFER2_SIZE * 0.0274958766106, CHAMFER2_SIZE * 0.999621916911), (0, 0), align=None)
    chamfer2_2_piece_10b = extrude(amount=96.571682988, mode=Mode.PRIVATE)
    chamfer2_2_piece_10b = split(chamfer2_2_piece_10b, bisect_by=Plane(origin=(3.670206373, 98, -4.670206373), z_dir=(0, 1, 0)), keep=Keep.TOP, mode=Mode.PRIVATE)
    chamfer2_2_piece_10 = chamfer2_2_piece_10a & chamfer2_2_piece_10b
    add(chamfer2_2_piece_10, mode=Mode.SUBTRACT)

    # Chamfer4
    chamfer4_edges = [part.edges().sort_by_distance(p)[0] for p in [
        (4, 4, 3),
        (4, 98, 3),
        (116, 4, -1.5),
        (116, 98, -1.5),
    ]]
    chamfer(chamfer4_edges, length=CHAMFER4_SIZE)


solid = part.part
